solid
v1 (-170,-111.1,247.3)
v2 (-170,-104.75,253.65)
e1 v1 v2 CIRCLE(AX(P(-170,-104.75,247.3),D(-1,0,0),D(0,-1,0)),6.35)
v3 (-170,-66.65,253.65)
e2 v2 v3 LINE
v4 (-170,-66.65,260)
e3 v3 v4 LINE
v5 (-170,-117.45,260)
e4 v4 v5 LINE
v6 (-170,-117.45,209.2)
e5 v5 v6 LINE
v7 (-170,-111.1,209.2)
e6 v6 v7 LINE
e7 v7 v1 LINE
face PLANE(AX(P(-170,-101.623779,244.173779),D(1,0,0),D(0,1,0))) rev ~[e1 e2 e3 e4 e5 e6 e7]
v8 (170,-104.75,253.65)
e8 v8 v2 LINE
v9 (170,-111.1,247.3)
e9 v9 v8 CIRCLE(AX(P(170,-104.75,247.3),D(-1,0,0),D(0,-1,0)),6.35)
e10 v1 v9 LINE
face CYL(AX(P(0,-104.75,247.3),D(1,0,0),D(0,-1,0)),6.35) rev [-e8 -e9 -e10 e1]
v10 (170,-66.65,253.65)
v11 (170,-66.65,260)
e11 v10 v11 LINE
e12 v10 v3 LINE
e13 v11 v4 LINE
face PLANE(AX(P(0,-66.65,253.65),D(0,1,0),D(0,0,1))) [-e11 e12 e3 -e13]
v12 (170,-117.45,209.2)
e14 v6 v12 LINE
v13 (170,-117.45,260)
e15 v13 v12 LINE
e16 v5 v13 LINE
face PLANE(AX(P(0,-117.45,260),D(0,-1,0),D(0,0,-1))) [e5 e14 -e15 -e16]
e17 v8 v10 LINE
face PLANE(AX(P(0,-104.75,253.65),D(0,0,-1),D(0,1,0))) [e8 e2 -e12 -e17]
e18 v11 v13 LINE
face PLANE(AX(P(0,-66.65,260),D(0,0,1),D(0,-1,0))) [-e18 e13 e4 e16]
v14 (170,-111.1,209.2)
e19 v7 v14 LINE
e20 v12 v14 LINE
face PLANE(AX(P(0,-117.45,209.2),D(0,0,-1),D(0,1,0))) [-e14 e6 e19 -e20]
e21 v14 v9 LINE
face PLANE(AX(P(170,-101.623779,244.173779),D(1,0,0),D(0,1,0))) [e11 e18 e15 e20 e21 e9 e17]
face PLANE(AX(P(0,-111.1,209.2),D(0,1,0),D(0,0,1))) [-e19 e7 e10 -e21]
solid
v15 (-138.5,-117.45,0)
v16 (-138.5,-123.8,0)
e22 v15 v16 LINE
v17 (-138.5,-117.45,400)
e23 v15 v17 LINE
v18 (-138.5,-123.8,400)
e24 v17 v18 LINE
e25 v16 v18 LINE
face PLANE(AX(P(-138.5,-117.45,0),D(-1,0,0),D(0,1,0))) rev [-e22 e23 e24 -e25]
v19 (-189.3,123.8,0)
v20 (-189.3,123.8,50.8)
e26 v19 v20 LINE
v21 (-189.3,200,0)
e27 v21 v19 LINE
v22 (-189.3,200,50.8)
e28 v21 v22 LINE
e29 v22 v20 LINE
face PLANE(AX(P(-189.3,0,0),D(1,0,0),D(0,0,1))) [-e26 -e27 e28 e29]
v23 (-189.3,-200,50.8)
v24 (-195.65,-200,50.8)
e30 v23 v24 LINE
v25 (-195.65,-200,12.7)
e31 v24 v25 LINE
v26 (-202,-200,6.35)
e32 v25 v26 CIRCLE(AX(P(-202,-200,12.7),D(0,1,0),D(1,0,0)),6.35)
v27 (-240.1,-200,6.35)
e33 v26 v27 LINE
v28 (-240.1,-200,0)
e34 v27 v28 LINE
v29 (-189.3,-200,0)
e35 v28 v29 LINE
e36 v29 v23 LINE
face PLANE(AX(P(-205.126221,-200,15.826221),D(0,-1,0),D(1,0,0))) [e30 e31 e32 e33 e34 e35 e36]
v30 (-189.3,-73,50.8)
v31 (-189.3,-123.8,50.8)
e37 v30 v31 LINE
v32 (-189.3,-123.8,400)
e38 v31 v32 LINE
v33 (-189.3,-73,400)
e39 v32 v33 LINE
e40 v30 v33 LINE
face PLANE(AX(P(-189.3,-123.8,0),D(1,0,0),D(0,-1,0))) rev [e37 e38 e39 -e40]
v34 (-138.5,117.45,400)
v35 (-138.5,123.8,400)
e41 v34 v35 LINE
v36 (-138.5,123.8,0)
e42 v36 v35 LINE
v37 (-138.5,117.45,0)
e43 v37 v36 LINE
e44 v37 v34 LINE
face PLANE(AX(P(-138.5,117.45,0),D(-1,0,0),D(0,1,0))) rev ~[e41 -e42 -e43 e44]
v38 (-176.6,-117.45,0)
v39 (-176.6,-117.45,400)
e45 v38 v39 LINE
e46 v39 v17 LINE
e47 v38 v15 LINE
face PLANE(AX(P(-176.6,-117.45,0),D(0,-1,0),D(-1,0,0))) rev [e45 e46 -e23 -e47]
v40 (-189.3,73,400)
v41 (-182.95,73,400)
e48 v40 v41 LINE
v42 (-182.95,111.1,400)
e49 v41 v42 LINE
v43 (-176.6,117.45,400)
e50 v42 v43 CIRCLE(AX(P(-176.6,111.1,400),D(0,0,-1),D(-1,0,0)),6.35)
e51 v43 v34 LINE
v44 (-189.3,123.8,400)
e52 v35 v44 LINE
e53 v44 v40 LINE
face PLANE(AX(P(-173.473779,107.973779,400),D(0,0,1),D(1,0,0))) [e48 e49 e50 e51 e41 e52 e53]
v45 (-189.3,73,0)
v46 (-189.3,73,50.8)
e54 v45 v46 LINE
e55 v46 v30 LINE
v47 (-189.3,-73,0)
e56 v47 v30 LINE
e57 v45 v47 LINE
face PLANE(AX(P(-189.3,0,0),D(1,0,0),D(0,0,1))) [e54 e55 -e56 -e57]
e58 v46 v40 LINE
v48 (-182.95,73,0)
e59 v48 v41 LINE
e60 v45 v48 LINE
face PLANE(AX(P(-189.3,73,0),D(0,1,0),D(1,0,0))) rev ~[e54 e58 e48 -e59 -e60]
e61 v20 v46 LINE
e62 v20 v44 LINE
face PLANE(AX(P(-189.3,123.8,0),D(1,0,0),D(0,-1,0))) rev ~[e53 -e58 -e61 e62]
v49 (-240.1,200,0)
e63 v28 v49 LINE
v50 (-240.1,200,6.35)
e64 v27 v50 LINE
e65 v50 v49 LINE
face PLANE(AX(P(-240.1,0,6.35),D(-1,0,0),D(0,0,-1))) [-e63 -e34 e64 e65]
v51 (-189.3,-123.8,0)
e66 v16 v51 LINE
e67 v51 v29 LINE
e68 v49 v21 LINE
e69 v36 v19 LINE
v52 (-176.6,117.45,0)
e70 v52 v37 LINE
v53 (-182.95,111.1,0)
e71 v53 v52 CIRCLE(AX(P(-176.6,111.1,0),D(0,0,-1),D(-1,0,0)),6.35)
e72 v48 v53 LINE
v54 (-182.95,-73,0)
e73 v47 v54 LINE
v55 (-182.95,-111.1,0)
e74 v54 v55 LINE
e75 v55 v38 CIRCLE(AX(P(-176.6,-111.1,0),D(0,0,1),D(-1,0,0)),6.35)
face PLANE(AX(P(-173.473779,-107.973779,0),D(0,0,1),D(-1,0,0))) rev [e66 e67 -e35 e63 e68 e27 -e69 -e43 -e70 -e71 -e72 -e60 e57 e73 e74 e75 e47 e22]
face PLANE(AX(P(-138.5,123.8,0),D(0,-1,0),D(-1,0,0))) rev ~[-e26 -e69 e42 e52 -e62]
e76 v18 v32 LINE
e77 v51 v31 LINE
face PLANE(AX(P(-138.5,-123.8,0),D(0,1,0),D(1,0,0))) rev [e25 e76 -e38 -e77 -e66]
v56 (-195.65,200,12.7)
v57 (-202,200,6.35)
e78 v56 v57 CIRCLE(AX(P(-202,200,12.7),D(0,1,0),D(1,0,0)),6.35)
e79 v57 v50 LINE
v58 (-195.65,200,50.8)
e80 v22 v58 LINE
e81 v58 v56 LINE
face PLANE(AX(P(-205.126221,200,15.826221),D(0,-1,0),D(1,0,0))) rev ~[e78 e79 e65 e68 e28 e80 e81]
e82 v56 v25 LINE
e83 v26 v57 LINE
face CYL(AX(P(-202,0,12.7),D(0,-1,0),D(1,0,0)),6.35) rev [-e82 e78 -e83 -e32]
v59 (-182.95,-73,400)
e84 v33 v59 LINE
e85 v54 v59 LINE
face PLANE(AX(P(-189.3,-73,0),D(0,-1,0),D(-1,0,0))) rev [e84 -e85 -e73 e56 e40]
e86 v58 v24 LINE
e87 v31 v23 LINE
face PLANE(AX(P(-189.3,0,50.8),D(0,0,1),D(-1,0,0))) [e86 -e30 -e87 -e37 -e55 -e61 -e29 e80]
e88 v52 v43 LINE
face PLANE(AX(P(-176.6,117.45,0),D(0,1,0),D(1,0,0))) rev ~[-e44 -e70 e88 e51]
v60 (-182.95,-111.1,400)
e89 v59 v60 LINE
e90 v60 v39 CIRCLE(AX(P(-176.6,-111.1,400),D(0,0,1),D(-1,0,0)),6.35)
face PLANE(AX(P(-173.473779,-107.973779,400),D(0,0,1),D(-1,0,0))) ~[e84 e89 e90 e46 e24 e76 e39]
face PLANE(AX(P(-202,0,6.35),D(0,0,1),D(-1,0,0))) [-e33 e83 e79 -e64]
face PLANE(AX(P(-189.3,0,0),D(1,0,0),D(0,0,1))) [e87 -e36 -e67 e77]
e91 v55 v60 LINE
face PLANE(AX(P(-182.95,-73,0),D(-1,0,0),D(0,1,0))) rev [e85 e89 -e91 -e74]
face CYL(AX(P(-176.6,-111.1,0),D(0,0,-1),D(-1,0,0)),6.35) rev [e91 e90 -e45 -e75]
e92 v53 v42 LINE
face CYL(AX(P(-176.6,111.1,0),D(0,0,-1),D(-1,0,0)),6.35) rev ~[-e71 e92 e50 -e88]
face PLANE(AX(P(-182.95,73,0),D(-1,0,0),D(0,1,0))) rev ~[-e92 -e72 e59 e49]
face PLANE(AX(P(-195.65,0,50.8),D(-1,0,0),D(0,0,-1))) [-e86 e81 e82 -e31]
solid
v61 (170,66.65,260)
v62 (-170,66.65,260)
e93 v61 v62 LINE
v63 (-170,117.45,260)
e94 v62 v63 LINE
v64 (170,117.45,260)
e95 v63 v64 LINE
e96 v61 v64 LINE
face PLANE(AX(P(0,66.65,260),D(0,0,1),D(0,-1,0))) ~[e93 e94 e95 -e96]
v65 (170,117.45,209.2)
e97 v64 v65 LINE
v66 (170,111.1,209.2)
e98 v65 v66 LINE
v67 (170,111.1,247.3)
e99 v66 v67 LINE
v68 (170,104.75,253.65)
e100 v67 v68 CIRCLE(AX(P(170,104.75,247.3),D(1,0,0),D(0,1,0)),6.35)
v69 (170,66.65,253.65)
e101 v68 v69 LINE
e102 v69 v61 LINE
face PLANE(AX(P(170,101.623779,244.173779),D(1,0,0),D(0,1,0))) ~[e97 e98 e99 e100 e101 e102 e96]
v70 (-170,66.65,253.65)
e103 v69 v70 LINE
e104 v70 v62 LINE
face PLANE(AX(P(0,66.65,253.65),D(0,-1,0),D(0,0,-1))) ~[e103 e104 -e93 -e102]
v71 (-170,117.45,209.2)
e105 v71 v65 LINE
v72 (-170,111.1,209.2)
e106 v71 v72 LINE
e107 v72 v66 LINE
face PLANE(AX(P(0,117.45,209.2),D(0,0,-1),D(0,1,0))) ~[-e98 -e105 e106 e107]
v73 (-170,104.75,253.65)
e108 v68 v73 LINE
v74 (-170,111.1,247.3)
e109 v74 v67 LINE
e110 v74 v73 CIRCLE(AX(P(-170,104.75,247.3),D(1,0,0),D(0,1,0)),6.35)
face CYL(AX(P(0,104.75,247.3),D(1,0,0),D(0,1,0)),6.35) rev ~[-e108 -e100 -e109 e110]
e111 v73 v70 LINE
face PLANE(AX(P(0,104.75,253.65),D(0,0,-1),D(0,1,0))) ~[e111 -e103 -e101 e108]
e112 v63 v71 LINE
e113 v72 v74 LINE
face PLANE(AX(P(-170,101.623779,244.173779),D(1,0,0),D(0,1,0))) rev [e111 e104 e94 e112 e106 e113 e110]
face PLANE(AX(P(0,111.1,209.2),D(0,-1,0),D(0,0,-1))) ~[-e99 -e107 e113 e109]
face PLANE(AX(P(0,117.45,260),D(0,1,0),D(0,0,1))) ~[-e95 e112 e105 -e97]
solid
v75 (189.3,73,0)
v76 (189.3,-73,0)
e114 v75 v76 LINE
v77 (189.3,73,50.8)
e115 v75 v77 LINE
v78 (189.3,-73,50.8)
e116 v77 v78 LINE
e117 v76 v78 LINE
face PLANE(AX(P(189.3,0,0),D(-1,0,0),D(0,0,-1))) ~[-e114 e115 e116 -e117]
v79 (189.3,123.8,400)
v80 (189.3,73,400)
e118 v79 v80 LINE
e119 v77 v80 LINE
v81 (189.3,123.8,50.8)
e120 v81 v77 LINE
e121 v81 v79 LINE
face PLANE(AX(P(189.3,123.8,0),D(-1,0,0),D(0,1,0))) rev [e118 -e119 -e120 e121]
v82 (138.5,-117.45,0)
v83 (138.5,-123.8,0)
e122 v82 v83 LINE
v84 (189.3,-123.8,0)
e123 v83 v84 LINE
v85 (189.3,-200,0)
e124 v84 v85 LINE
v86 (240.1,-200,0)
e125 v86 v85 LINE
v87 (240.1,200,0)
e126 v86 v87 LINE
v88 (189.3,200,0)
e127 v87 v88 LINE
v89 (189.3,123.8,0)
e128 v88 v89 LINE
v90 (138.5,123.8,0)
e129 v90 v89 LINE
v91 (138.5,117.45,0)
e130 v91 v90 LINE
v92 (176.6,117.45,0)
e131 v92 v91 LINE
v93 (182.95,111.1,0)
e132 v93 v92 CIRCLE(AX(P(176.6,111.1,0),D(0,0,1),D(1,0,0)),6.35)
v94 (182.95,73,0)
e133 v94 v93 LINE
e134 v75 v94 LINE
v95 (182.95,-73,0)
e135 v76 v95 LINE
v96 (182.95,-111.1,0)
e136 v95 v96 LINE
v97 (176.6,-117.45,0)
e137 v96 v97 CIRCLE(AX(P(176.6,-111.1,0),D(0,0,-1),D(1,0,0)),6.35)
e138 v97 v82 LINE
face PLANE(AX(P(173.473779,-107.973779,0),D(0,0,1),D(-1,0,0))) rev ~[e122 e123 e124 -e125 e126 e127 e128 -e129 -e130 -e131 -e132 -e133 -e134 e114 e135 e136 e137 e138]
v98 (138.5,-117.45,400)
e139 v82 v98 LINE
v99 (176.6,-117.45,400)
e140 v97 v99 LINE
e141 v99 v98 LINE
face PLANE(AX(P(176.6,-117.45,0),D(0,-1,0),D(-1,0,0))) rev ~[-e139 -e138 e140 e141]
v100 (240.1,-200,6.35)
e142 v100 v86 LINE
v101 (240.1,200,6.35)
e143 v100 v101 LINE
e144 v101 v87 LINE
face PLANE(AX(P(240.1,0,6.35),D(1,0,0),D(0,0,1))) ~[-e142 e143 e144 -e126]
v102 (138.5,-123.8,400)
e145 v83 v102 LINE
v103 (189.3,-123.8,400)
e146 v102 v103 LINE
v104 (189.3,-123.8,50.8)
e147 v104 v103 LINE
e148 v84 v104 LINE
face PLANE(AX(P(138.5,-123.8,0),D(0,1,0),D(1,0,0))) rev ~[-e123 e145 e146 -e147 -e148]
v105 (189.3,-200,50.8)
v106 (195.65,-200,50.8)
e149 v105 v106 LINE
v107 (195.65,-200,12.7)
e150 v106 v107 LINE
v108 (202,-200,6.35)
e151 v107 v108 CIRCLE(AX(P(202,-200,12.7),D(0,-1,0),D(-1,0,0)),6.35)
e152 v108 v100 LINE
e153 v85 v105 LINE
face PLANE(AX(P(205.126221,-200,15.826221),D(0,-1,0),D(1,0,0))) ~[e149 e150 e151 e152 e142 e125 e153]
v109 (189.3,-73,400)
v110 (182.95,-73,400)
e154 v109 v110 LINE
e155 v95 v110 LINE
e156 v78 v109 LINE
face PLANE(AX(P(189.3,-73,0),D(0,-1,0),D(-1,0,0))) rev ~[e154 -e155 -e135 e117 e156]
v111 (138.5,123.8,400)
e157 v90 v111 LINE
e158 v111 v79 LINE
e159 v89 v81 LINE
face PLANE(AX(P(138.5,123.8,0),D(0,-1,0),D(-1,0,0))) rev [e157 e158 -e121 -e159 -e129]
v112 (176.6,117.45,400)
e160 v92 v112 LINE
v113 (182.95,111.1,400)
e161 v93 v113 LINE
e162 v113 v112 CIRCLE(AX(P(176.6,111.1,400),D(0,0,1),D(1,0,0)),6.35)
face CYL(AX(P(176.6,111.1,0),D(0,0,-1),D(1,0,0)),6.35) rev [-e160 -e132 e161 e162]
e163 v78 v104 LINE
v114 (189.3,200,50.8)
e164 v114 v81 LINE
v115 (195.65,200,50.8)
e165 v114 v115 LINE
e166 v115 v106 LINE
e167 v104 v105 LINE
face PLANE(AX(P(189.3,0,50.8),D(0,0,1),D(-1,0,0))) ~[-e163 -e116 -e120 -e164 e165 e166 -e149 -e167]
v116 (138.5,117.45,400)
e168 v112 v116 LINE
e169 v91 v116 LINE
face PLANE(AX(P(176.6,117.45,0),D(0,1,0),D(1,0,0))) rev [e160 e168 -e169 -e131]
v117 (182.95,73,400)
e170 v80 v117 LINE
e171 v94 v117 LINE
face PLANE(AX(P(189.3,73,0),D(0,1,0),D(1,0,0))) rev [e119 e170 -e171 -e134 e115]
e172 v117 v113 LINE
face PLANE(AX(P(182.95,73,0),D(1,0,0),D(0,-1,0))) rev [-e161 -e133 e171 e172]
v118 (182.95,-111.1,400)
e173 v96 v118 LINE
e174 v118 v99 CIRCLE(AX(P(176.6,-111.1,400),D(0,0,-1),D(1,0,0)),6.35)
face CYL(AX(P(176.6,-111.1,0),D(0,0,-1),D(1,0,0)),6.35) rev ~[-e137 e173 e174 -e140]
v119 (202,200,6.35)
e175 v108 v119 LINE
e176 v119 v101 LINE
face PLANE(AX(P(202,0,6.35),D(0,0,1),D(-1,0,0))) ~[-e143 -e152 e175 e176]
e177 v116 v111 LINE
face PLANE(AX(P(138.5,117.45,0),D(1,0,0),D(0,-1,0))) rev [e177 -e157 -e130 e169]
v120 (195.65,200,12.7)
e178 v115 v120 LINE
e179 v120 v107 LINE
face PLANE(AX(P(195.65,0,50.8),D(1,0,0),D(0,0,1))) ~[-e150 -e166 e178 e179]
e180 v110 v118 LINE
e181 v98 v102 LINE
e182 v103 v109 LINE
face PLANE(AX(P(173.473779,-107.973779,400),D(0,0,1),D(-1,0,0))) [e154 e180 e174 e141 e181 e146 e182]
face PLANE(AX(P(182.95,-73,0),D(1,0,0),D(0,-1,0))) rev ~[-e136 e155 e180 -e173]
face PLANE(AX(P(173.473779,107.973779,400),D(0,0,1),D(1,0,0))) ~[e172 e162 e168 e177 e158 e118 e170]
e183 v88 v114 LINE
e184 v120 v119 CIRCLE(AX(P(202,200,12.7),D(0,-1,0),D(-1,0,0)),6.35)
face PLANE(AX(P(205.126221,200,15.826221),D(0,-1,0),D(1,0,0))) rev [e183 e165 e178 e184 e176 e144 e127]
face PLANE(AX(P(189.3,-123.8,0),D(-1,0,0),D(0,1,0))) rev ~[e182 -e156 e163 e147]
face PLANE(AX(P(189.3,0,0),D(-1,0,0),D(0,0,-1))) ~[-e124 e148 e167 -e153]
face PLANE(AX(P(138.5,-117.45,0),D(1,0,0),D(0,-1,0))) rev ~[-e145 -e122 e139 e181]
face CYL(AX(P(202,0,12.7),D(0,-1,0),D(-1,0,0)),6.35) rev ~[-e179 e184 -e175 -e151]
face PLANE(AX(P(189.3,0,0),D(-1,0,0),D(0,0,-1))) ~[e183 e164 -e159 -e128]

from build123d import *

# Parameters (mm, degrees)
F1_DEPTH = 200
F3_DEPTH = 400
F6_DEPTH = 170


# Not quite as in the source:
# - a pattern or mirror of a feature is missing from the dataset's text; its kind, count and spacing are read off the source's solid


with BuildPart() as f1:
    # F0 (on Front) → F1 (new body, symmetric)
    with BuildSketch(Plane.XZ):
        with BuildLine():
            Line((-240.1, 0), (-189.3, 0))
            Line((-189.3, 0), (-189.3, 50.8))
            Line((-189.3, 50.8), (-195.65, 50.8))
            Line((-195.65, 50.8), (-195.65, 12.7))
            ThreePointArc((-195.65, 12.7), (-197.5098719395, 8.2098719395), (-202, 6.35))
            Line((-202, 6.35), (-240.1, 6.35))
            Line((-240.1, 6.35), (-240.1, 0))
        make_face()
    extrude(amount=F1_DEPTH, both=True)

    # F2 (on Top) → F3 (join)
    with BuildSketch(Plane.XY):
        with BuildLine():
            Line((-138.5, 123.8), (-189.3, 123.8))
            Line((-189.3, 123.8), (-189.3, 73))
            Line((-189.3, 73), (-182.95, 73))
            Line((-182.95, 73), (-182.95, 111.1))
            ThreePointArc((-182.95, 111.1), (-181.0901280605, 115.5901280605), (-176.6, 117.45))
            Line((-176.6, 117.45), (-138.5, 117.45))
            Line((-138.5, 117.45), (-138.5, 123.8))
        make_face()
    f3 = extrude(amount=F3_DEPTH)

    # F3_copies: F3 across plane
    add(f3.mirror(Plane(origin=(0, 0, 0), x_dir=(0, 0, -1), z_dir=(0, -1, 0))))


with BuildPart() as f4_1:
    # F4: instance of F1
    add(f1.part.mirror(Plane.YZ))


with BuildPart() as f6:
    # F5 (on Right) → F6 (new body, symmetric)
    with BuildSketch(Plane.YZ):
        with BuildLine():
            Line((-66.65, 260), (-117.45, 260))
            Line((-117.45, 260), (-117.45, 209.2))
            Line((-117.45, 209.2), (-111.1, 209.2))
            Line((-111.1, 209.2), (-111.1, 247.3))
            ThreePointArc((-111.1, 247.3), (-109.2401280605, 251.7901280605), (-104.75, 253.65))
            Line((-104.75, 253.65), (-66.65, 253.65))
            Line((-66.65, 253.65), (-66.65, 260))
        make_face()
    extrude(amount=F6_DEPTH, both=True)


with BuildPart() as f7_1:
    # F7: instance of F6
    add(f6.part.mirror(Plane.XZ))


solid = Compound([f1.part, f4_1.part, f6.part, f7_1.part])
